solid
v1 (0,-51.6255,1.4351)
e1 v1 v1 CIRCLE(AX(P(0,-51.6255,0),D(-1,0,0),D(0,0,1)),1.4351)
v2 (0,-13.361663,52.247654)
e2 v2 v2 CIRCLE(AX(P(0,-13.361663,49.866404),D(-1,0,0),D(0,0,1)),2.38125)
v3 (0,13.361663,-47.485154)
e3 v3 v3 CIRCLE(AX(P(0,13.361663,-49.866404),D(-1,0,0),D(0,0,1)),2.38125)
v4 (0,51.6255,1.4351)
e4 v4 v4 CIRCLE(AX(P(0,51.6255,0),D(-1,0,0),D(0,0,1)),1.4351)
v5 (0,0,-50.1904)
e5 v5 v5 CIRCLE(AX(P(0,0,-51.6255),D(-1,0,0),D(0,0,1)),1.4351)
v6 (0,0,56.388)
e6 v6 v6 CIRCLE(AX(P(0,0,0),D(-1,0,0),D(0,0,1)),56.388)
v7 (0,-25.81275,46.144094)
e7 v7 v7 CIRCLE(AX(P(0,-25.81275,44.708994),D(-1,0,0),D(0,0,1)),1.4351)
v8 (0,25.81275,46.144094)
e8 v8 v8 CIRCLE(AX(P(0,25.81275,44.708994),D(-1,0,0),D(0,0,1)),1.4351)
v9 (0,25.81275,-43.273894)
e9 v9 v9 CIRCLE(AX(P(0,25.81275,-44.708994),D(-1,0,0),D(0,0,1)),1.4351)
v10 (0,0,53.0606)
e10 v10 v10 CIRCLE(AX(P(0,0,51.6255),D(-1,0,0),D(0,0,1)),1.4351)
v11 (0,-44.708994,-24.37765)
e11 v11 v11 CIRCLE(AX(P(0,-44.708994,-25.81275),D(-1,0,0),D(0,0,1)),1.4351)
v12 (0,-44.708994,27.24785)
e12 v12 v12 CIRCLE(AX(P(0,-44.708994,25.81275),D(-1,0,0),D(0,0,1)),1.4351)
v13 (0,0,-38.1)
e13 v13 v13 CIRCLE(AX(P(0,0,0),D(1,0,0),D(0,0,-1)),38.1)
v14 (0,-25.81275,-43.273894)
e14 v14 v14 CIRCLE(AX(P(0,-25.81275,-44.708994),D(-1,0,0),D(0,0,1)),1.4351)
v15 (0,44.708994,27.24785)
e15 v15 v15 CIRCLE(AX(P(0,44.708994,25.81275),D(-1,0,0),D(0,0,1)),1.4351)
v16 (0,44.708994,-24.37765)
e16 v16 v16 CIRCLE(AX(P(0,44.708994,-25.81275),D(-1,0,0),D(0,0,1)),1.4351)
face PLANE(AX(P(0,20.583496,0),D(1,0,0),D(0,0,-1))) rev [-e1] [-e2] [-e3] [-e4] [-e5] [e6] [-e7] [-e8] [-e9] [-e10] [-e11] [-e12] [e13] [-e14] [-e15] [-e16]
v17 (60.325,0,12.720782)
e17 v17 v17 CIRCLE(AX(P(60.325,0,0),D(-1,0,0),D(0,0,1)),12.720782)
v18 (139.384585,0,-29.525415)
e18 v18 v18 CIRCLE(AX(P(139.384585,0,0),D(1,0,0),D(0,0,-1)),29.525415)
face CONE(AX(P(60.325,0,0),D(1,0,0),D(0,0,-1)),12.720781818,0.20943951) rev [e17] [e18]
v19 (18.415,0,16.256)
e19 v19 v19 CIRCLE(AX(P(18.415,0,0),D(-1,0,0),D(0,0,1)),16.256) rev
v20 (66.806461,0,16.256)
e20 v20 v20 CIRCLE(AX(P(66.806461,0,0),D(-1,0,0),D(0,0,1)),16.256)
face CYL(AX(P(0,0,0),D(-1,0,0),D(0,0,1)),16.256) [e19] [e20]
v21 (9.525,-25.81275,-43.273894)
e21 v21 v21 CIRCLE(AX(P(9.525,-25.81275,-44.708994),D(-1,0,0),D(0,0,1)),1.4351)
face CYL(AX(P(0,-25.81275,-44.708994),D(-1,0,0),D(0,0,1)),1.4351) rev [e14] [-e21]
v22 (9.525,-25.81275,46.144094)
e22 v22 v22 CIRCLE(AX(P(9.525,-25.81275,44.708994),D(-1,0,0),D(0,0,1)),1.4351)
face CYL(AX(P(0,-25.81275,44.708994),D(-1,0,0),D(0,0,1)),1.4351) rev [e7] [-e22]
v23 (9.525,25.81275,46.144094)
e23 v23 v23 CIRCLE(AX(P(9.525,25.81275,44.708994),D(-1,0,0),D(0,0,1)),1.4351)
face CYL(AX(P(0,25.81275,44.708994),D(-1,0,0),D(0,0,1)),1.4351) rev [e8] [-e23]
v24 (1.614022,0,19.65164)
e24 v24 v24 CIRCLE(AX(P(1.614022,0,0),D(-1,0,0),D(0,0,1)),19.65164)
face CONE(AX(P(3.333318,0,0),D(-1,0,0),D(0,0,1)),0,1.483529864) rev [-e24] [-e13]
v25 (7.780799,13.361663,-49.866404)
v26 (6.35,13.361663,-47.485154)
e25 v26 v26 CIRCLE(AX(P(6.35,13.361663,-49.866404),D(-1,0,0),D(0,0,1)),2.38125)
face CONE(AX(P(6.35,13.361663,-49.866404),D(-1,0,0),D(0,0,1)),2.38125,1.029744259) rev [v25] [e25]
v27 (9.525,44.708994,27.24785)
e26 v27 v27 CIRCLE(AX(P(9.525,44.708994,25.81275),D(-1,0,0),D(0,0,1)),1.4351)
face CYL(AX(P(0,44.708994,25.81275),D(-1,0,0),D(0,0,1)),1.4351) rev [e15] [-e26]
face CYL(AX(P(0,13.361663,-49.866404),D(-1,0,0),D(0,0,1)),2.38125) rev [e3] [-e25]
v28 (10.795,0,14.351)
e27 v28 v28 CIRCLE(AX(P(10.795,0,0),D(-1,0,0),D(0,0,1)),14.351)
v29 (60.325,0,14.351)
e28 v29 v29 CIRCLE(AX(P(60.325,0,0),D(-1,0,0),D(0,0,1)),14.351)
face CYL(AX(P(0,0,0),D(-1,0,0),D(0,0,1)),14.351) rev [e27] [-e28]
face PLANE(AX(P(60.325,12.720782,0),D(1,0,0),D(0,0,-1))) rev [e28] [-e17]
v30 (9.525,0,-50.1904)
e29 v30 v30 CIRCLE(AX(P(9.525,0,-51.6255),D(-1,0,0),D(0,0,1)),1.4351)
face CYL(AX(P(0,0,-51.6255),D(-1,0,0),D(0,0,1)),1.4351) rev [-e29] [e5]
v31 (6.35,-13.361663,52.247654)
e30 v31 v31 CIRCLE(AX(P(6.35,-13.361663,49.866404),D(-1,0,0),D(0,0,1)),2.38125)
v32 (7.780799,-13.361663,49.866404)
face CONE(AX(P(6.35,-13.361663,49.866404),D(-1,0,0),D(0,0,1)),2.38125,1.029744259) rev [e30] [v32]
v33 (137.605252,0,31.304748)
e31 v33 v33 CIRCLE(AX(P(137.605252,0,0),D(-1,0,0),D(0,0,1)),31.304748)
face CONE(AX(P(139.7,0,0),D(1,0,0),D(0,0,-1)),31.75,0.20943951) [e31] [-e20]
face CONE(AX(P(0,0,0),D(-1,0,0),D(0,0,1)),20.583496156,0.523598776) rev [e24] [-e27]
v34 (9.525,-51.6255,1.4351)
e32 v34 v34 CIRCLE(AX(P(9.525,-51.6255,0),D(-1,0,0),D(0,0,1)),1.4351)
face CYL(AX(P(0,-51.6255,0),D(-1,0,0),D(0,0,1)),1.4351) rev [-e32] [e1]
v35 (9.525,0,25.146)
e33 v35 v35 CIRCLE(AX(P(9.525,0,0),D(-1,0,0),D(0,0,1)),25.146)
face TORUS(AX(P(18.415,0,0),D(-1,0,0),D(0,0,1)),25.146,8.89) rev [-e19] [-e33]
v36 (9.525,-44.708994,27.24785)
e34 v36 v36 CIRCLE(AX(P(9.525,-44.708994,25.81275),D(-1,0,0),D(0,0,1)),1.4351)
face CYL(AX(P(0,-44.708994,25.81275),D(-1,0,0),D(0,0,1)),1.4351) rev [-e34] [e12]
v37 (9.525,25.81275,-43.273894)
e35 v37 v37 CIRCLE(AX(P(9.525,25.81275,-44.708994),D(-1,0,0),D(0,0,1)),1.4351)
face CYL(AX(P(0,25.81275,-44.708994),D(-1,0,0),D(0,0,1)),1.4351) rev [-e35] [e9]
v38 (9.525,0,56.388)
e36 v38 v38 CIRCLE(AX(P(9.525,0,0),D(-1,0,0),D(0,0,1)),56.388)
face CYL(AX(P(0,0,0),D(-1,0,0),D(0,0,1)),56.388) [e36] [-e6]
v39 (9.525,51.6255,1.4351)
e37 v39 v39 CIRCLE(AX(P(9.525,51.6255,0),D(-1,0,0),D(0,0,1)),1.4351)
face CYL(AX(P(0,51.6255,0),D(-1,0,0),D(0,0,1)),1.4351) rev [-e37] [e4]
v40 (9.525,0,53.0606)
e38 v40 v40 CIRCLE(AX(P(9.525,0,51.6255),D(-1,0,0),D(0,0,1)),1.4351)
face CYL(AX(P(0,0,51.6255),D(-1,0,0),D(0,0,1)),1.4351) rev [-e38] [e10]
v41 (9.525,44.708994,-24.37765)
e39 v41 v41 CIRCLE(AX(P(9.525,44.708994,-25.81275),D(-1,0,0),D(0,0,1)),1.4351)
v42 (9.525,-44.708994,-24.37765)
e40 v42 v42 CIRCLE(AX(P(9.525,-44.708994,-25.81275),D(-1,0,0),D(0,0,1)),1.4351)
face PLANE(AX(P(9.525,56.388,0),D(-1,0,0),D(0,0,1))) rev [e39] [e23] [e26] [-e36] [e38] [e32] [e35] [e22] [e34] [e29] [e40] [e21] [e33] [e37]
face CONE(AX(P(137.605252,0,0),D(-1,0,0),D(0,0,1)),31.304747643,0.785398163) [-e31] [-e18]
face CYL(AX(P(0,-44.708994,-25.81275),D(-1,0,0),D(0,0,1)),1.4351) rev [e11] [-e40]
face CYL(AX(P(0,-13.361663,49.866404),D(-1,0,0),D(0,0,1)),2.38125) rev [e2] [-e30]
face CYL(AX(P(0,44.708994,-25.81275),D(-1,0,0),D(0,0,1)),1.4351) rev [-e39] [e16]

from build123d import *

# Parameters (mm, degrees)
FLANGE_HOLES_D    = 2.8702
DOWEL_HOLES_D     = 4.7625
DOWEL_HOLES_DEPTH = 6.35
DOWEL_HOLES_TIP   = 1.430799349
FILLET1_R         = 8.89
CHAMFER1_SIZE     = 2.141545552
CHAMFER1_SIZE_2   = 2.54


with BuildPart() as part:
    # Sketch2 → Main Structure (revolve)
    with BuildSketch(Plane.XY, mode=Mode.PRIVATE) as main_structure_sk:
        Polygon((0, 20.583496156), (0, 56.388), (9.525, 56.388), (9.525, 16.256), (66.806461084, 16.256), (139.7, 31.75), (139.7, 29.592458901), (60.325, 12.720781818), (60.325, 14.351), (10.795, 14.351), align=None)
    revolve(main_structure_sk.sketch.rotate(Axis((0, 0, 0), (1, 0, 0)), 90), axis=Axis((0, 0, 0), (1, 0, 0)))

    # Flange Holes (through all)
    with Locations(Plane.ZY):
        with Locations((0, -51.6255), (-25.81275, -44.708994483), (-44.708994483, -25.81275), (-51.6255, 0), (-44.708994483, 25.81275), (-25.81275, 44.708994483), (0, 51.6255), (25.81275, 44.708994483), (44.708994483, 25.81275), (51.6255, 0), (44.708994483, -25.81275), (25.81275, -44.708994483)):
            Hole(FLANGE_HOLES_D / 2)

    # Dowel Holes
    with Locations(Plane.ZY):
        with Locations((49.866403745, -13.361662613), (-49.866403745, 13.361662613)):
            Hole(DOWEL_HOLES_D / 2, depth=DOWEL_HOLES_DEPTH)
            with Locations((0, 0, -(DOWEL_HOLES_DEPTH + DOWEL_HOLES_TIP / 2))):  # 118° drill point
                Cone(0, DOWEL_HOLES_D / 2, DOWEL_HOLES_TIP, mode=Mode.SUBTRACT)

    # Fillet1
    fillet1_edges = [part.edges().sort_by_distance(p)[0] for p in [
        (9.525, 0, -16.256),
    ]]
    fillet(fillet1_edges, radius=FILLET1_R)

    # Sketch13 → Cut-Revolve1 (revolve, cut)
    with BuildSketch(Plane(origin=(0, 0, 0), x_dir=(1, 0, 0), z_dir=(0, 1, 0)), mode=Mode.PRIVATE) as cut_revolve1_sk:
        Polygon((0, 38.1), (3.33331808, 0), (0, 0), align=None)
    revolve(cut_revolve1_sk.sketch.rotate(Axis((3.33331808, 0, 0), (-1, 0, 0)), 180), axis=Axis((3.33331808, 0, 0), (-1, 0, 0)), mode=Mode.SUBTRACT)

    # Chamfer1
    # the kernel refuses this chamfer: 2.54, 2.141545552 mm, written as the material it takes off along each edge
    with BuildSketch(Plane(origin=(139.7, 0, 0), x_dir=(0, 0, 1), z_dir=(0, 1, 0))) as chamfer1_piece_1:
        Polygon((31.75 - CHAMFER1_SIZE * 0.207911690799, -CHAMFER1_SIZE * 0.978147600645), (31.75 - CHAMFER1_SIZE_2, 0), (31.75, 0), align=None)
    revolve(axis=Axis((139.7, 0, 0), (1, 0, 0)), mode=Mode.SUBTRACT)


solid = part.part
